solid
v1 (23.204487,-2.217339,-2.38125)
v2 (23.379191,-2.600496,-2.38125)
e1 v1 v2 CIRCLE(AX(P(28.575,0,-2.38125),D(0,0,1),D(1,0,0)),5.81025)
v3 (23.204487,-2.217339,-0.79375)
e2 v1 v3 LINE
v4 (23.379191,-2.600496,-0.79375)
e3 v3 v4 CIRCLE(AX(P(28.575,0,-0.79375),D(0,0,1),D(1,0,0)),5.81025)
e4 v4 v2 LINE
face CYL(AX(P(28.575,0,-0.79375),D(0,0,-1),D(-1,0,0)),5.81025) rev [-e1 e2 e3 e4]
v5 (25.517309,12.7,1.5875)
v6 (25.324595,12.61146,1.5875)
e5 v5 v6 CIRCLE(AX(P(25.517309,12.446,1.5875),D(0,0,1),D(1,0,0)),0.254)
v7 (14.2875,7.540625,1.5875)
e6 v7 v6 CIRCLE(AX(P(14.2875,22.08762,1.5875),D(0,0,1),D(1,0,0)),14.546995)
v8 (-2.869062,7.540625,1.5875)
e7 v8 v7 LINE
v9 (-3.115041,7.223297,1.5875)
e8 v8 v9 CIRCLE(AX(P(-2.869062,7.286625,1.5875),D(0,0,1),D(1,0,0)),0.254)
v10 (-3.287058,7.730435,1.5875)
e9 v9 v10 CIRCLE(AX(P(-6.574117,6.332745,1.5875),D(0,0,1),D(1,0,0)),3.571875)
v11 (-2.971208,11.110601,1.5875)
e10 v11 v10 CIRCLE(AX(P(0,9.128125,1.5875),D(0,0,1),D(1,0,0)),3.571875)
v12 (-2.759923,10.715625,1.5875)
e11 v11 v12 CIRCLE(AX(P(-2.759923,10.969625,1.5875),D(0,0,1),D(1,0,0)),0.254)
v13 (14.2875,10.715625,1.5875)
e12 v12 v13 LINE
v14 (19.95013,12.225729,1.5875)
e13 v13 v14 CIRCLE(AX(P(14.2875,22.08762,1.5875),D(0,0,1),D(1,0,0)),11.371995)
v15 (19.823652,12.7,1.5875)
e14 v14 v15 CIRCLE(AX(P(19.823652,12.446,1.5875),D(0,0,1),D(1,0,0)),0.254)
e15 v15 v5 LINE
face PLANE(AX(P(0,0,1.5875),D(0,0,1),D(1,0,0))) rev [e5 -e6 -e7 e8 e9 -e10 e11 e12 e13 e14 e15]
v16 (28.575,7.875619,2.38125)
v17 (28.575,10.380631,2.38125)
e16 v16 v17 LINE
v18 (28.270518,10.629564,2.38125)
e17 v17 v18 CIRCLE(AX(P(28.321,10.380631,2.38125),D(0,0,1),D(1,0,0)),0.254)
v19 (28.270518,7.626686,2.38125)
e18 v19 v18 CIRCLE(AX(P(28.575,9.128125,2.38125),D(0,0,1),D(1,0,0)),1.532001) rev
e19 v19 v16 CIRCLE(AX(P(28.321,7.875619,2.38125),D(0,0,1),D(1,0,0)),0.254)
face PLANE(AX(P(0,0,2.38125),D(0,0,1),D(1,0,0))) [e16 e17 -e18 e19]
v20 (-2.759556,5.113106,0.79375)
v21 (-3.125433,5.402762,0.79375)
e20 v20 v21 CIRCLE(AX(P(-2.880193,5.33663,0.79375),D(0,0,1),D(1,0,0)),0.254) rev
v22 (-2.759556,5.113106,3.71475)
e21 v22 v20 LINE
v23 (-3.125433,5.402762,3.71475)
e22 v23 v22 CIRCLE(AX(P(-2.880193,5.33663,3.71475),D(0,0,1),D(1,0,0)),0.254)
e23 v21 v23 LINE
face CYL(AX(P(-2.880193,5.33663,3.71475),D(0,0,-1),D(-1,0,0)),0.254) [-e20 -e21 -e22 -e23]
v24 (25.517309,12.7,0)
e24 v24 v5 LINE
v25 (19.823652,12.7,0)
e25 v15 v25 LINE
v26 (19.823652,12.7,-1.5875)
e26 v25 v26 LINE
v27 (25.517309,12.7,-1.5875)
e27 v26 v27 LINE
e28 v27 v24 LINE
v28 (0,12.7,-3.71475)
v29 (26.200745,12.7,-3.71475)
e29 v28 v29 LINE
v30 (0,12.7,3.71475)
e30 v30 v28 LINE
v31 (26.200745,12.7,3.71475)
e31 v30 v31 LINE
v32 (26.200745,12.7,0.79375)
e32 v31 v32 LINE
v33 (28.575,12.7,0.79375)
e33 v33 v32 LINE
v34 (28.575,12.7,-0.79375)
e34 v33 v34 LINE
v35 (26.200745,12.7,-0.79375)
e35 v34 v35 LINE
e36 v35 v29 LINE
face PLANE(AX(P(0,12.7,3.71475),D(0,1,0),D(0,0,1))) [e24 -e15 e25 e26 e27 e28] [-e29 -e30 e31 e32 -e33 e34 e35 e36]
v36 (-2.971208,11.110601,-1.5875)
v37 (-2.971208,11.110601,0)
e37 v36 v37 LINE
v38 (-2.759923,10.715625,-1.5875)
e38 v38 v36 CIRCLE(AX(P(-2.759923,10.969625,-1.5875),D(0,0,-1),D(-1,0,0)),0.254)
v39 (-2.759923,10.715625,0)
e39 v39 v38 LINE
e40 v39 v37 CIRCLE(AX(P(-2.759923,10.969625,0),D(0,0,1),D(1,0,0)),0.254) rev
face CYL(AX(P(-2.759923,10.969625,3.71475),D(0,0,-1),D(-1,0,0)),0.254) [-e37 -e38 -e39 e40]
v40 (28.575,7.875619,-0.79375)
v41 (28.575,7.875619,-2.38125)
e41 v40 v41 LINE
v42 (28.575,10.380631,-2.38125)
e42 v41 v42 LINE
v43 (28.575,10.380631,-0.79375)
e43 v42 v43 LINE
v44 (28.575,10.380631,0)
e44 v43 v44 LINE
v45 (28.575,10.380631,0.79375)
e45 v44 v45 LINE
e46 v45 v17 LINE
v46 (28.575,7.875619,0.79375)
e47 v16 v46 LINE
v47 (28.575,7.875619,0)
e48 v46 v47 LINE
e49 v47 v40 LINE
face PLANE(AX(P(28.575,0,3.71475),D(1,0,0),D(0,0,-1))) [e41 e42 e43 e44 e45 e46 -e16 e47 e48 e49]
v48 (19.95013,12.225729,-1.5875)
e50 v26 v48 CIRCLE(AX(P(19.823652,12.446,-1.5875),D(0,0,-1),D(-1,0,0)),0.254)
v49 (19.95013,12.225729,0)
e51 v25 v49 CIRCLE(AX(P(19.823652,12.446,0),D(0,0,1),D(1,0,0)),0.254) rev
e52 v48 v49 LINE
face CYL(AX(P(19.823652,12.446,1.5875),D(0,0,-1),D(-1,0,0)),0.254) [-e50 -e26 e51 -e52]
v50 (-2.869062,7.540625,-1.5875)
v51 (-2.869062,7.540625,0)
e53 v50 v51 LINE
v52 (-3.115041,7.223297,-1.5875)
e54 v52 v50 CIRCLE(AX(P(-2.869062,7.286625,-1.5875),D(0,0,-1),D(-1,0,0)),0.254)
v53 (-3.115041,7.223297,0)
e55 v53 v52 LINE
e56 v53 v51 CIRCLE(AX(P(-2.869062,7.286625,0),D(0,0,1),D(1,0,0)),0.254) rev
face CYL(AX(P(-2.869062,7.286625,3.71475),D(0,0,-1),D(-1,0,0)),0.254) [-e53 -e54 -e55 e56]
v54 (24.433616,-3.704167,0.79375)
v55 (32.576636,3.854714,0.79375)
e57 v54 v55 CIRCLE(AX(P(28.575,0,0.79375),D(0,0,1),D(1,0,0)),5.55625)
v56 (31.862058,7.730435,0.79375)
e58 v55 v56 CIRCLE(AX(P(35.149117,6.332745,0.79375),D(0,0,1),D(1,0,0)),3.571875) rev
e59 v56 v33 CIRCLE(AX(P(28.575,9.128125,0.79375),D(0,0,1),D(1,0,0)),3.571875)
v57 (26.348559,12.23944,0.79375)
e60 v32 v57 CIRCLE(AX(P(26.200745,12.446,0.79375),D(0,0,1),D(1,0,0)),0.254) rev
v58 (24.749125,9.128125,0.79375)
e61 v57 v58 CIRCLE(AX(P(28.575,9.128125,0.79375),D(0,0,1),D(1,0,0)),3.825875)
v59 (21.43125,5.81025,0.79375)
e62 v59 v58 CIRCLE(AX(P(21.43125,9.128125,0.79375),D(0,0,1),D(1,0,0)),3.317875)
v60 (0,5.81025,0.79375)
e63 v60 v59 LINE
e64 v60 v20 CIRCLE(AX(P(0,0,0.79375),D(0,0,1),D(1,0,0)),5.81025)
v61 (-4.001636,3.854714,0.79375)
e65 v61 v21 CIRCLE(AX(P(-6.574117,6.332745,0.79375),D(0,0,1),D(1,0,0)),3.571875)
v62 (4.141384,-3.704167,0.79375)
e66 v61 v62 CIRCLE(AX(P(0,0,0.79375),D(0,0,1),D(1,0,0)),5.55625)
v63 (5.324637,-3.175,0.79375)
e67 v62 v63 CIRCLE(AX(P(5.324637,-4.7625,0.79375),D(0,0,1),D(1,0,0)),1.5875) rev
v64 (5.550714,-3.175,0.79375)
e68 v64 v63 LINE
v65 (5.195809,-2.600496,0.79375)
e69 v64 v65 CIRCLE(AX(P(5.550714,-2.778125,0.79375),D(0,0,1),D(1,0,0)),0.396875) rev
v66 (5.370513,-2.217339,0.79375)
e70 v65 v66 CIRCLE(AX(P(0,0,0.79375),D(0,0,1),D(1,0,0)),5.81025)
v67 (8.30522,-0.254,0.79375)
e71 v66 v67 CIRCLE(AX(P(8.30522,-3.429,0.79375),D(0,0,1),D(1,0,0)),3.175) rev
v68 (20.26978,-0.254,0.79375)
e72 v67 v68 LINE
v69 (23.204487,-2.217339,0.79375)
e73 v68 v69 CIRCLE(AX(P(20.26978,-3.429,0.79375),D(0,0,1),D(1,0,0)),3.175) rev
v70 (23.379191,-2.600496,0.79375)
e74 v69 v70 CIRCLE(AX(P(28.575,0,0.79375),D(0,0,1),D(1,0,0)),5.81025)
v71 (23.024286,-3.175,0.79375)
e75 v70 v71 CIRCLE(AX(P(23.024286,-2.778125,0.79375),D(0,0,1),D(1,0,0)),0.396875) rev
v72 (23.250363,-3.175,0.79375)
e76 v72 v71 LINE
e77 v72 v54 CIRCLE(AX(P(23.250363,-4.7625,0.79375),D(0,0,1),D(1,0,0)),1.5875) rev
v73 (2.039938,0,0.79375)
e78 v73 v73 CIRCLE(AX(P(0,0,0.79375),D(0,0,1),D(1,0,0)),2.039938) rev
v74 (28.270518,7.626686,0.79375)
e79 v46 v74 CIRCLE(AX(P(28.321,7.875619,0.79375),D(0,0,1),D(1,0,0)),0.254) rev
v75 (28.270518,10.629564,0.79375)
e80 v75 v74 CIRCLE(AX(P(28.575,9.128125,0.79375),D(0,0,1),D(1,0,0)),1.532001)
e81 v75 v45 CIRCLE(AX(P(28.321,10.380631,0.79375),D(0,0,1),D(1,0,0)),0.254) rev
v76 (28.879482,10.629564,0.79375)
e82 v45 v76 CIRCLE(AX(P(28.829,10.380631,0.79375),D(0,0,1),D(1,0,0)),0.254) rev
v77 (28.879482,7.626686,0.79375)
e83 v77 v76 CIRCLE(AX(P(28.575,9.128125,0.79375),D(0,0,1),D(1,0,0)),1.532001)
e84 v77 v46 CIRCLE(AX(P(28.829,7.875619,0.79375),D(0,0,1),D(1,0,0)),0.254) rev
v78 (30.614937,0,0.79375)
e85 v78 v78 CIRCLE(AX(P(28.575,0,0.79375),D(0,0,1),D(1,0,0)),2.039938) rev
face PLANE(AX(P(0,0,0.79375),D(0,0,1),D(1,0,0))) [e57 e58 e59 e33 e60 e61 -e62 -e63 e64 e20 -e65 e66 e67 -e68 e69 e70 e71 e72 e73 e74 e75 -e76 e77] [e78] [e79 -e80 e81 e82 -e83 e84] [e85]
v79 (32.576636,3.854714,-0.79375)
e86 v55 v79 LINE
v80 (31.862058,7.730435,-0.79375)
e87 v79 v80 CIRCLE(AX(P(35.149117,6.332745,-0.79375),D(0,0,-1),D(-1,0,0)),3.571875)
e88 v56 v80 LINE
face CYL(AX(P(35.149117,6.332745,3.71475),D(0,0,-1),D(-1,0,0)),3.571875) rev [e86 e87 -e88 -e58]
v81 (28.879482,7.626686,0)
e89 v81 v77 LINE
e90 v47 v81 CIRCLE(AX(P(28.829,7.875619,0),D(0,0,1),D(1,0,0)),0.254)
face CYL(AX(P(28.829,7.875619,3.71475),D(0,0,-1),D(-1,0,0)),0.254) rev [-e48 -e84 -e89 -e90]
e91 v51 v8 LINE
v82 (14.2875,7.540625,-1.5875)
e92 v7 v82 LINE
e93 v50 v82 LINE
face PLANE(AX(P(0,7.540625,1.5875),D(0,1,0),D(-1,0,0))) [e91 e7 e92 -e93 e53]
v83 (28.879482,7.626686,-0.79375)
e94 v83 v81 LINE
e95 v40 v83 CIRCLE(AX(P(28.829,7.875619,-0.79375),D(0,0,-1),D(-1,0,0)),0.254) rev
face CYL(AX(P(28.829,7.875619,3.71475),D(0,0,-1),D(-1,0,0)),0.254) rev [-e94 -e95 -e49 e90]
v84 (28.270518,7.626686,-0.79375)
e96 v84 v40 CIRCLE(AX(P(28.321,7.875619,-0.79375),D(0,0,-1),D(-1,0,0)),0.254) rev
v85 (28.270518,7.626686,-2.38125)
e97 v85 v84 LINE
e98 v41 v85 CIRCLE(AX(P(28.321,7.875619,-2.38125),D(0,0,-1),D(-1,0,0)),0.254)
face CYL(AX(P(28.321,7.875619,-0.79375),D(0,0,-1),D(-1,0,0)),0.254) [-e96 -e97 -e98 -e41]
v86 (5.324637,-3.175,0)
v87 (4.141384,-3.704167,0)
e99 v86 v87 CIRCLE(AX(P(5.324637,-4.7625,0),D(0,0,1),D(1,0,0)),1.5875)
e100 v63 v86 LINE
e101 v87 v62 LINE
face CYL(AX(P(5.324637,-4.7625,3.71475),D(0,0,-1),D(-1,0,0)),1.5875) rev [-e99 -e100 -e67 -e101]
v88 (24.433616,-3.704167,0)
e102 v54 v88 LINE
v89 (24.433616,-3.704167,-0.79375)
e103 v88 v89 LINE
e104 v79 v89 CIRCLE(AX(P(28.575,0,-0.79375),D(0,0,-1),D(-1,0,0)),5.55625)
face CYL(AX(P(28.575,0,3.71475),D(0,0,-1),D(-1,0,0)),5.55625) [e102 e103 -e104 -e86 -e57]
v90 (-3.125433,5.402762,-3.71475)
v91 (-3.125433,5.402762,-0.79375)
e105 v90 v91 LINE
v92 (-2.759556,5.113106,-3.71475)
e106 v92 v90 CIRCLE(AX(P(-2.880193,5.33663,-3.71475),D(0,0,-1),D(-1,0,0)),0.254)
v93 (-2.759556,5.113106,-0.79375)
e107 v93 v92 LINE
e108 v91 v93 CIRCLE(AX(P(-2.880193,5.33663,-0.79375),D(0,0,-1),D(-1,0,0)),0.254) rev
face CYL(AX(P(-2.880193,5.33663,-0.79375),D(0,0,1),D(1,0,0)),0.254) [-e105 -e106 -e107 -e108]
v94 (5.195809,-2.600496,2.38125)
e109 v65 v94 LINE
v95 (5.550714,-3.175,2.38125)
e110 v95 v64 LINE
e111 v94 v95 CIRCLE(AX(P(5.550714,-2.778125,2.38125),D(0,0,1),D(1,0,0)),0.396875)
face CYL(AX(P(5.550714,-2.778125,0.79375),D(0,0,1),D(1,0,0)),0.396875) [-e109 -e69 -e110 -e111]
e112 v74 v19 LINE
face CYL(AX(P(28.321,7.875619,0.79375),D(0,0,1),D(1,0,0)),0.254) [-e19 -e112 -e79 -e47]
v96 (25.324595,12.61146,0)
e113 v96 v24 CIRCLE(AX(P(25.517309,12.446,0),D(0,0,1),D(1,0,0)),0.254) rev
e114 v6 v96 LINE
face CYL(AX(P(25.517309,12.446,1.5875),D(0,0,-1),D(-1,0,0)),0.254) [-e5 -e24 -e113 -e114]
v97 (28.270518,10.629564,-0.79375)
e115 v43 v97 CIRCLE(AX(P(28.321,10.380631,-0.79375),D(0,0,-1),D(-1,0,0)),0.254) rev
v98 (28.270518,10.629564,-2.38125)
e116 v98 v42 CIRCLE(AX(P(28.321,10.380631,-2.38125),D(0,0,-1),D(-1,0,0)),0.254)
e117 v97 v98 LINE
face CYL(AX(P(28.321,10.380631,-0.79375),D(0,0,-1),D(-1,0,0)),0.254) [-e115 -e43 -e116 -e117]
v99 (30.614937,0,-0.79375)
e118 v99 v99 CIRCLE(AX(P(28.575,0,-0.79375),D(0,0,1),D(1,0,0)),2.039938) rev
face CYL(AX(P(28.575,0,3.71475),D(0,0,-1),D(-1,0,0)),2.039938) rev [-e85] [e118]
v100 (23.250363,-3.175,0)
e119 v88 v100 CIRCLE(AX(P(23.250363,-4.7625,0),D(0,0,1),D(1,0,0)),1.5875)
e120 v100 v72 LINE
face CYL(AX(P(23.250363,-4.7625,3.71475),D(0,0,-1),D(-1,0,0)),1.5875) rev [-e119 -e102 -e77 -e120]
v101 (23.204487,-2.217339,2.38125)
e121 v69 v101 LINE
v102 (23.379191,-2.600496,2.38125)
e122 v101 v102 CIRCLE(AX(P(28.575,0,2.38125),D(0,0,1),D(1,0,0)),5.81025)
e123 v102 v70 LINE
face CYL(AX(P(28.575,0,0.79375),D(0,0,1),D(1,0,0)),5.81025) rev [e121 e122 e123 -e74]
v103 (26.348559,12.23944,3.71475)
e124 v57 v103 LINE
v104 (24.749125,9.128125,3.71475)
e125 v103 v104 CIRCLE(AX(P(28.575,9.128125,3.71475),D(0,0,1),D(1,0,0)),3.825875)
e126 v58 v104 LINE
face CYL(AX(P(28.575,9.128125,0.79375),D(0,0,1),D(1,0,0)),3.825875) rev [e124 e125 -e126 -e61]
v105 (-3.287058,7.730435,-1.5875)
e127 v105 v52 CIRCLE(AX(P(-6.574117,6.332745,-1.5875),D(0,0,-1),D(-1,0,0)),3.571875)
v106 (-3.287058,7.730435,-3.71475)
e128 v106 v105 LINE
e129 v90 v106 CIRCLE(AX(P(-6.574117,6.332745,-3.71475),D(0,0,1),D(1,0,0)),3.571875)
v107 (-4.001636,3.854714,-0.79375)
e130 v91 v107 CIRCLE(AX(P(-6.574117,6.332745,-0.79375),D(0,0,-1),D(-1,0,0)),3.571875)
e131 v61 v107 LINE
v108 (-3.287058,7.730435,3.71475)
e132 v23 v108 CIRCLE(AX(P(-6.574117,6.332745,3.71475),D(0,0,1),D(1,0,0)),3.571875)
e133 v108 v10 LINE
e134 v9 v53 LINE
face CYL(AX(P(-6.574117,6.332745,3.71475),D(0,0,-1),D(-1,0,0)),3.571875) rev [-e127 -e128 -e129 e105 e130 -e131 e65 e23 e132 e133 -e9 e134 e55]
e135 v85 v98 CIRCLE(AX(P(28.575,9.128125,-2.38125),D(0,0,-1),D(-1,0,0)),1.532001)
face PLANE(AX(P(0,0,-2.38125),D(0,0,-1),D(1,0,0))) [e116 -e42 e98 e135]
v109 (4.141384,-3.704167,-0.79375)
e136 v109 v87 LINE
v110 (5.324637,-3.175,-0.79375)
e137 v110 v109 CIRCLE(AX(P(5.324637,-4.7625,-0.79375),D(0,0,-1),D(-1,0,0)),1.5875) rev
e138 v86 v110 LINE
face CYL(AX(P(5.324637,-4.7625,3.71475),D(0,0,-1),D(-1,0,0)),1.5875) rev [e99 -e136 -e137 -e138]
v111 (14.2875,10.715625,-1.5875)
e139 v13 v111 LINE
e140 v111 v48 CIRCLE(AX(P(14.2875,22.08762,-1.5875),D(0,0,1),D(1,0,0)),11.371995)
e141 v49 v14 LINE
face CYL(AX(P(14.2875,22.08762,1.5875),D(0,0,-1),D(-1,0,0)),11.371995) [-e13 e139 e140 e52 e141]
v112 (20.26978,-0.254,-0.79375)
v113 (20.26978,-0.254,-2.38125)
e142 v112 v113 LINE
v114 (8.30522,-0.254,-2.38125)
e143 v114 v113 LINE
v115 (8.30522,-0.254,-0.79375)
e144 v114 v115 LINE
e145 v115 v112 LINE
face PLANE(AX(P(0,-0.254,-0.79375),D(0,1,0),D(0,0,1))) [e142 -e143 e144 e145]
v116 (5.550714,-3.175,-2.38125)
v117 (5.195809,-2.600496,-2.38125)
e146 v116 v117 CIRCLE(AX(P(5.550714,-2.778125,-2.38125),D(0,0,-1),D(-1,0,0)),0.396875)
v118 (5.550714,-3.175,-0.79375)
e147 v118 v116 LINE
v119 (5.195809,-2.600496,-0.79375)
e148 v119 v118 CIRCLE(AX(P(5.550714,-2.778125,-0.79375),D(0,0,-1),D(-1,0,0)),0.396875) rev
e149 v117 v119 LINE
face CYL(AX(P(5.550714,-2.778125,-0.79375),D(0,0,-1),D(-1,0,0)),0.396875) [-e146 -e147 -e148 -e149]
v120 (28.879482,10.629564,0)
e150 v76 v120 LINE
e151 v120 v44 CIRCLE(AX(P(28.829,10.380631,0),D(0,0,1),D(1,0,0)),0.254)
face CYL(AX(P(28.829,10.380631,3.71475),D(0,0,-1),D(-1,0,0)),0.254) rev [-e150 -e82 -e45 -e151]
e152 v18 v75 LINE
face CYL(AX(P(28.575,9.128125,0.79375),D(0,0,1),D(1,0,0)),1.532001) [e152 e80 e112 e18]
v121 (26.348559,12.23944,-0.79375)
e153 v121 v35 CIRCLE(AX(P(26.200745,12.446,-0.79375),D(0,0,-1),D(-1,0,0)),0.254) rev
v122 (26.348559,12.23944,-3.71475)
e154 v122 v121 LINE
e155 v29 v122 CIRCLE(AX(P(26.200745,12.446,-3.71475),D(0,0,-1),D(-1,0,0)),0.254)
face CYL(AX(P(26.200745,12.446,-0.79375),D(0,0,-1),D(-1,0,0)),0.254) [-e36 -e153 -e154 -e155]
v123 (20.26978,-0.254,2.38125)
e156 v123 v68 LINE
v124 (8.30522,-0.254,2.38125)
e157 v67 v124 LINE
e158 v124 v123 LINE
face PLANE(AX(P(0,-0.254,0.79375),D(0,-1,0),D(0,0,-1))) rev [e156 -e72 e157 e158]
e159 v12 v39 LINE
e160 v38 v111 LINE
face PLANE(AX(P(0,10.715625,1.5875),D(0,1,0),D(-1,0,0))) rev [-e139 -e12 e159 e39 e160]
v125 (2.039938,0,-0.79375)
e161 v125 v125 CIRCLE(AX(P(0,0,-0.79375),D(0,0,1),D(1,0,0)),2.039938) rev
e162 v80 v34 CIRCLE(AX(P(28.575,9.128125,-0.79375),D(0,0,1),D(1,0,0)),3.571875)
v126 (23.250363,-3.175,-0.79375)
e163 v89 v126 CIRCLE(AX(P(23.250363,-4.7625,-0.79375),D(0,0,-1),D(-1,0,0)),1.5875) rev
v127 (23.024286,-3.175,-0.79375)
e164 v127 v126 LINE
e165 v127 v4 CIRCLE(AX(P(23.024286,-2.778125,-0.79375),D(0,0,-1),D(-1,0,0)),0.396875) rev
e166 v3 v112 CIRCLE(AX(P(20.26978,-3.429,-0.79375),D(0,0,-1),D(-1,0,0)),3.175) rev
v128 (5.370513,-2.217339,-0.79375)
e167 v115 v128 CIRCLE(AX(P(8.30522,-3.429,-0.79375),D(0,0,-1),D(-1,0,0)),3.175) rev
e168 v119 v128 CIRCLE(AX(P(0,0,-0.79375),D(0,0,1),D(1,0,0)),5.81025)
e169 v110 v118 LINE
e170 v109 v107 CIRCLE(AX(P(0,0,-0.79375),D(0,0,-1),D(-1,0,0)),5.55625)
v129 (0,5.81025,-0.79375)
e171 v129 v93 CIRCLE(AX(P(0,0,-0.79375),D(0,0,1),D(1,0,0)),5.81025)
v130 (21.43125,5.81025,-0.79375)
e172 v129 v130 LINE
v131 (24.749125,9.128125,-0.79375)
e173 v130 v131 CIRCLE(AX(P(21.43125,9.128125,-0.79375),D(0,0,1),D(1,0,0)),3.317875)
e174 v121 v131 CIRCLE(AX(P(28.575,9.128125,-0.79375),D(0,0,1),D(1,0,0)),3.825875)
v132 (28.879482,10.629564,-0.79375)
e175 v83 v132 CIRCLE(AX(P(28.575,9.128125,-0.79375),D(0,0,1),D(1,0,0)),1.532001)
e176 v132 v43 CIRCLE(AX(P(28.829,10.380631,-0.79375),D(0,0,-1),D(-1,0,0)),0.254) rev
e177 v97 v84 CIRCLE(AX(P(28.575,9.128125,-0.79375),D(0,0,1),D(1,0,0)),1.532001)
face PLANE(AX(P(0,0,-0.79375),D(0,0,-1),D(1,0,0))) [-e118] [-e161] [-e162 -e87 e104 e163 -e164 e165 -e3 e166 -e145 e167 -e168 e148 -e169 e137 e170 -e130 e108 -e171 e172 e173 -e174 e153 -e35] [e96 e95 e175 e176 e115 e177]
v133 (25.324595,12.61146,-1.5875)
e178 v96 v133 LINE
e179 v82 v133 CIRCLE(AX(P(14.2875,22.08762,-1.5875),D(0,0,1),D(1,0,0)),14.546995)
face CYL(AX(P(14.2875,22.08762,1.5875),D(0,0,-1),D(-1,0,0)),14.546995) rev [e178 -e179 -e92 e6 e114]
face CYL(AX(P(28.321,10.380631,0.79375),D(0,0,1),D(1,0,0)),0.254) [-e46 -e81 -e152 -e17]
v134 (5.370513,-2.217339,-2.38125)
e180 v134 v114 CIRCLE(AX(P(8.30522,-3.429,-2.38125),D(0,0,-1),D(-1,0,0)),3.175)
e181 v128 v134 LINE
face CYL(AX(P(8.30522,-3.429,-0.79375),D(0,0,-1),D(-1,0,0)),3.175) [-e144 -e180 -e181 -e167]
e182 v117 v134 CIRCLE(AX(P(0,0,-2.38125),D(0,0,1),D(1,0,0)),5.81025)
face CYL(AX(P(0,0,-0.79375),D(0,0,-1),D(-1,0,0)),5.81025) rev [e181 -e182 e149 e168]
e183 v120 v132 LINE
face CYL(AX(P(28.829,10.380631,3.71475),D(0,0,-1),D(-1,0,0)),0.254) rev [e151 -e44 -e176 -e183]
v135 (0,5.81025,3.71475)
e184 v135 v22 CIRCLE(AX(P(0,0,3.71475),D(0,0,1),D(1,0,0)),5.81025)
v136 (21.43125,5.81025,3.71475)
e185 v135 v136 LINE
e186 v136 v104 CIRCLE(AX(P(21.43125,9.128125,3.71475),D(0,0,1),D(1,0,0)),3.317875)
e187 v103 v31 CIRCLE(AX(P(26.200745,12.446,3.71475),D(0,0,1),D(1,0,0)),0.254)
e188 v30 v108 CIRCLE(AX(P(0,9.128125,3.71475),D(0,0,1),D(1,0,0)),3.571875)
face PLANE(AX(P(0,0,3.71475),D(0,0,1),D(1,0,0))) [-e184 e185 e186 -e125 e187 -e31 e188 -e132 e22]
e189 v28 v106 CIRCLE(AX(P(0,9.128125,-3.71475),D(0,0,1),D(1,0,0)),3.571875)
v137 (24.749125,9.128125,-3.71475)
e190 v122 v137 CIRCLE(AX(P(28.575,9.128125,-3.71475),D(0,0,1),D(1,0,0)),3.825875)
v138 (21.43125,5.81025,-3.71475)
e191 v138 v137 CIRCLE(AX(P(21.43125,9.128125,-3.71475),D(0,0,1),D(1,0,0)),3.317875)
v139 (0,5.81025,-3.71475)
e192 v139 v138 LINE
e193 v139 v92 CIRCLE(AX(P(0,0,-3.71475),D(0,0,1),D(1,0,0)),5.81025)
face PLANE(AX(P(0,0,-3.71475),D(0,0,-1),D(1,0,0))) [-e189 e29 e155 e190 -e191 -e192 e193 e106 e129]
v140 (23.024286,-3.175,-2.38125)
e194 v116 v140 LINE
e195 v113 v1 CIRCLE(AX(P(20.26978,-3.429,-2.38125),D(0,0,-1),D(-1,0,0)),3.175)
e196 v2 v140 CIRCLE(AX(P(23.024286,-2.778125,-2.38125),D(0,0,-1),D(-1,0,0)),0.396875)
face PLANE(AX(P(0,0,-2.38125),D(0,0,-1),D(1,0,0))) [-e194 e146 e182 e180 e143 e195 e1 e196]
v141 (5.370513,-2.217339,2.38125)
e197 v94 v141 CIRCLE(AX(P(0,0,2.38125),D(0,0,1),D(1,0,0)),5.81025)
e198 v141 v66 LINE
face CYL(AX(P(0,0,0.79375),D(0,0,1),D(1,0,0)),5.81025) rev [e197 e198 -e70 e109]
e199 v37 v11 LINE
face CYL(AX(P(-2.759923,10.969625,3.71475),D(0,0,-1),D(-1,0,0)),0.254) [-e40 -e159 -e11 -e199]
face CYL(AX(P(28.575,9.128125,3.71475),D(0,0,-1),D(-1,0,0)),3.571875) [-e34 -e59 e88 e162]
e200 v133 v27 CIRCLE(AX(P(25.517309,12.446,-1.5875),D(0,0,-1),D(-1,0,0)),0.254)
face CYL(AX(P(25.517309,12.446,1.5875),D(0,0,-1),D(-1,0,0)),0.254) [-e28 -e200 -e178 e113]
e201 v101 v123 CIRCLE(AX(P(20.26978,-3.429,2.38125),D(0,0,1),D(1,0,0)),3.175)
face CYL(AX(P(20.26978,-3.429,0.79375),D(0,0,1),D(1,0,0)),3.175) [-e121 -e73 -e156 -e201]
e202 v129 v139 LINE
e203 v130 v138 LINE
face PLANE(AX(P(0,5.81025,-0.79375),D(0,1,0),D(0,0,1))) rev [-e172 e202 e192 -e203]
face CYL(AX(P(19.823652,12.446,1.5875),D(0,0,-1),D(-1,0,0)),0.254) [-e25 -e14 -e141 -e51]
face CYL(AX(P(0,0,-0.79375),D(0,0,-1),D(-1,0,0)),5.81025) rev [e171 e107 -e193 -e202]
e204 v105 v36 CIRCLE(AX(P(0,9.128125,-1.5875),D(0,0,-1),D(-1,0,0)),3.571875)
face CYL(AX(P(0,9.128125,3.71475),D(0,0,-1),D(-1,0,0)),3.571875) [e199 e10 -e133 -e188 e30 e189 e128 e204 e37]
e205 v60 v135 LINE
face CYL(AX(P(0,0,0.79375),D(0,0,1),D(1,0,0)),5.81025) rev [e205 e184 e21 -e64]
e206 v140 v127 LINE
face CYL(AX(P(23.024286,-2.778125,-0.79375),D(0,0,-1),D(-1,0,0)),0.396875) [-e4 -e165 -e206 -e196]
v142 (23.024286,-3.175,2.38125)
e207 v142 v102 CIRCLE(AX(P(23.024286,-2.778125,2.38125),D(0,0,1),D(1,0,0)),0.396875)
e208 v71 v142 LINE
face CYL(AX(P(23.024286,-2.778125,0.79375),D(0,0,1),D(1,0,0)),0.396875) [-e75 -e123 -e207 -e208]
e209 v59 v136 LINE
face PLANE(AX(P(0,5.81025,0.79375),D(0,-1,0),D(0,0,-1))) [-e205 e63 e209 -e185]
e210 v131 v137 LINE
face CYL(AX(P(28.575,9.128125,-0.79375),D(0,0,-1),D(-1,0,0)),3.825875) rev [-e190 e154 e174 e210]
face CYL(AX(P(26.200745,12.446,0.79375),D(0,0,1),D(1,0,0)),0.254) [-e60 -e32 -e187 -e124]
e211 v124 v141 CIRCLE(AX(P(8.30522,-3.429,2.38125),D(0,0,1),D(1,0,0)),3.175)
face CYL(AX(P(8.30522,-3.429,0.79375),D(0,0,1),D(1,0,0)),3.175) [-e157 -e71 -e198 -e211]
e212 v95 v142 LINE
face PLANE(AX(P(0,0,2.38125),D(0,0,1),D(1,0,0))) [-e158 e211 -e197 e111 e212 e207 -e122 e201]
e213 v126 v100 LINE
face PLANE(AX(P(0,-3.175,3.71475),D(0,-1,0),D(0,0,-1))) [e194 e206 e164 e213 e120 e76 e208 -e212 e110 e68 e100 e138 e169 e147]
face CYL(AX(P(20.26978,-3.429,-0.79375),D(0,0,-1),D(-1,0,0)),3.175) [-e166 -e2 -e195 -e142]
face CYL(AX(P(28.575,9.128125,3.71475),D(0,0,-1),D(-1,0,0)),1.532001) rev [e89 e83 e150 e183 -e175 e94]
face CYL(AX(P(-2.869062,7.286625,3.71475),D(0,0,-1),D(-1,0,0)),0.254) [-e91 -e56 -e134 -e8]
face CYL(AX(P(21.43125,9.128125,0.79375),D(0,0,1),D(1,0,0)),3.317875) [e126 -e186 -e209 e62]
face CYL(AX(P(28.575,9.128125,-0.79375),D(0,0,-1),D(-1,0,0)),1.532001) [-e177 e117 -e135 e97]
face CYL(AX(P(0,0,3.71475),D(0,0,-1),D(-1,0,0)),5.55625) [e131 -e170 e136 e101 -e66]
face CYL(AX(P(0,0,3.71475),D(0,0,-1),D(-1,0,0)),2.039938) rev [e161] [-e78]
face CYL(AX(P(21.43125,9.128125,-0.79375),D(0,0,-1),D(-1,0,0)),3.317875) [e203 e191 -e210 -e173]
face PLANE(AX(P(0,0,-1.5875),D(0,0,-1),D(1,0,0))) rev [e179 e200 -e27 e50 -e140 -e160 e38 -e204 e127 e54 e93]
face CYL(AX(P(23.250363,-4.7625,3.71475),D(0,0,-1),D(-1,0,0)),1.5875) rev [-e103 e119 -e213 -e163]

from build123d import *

# Parameters (mm, degrees)
SKETCH2_R           = 2.0399375
BOSS_EXTRUDE1_DEPTH = 3.71475
CUT_EXTRUDE1_DEPTH  = 1.5875
CUT_EXTRUDE5_DEPTH  = 37.606441976
CUT_EXTRUDE6_START  = -2.921
SKETCH4_R           = 2.0399375
SKETCH4_R_2         = 1.532001
CUT_EXTRUDE6_DEPTH  = 2.921
CUT_EXTRUDE7_START  = -1.3335
CUT_EXTRUDE7_DEPTH  = 1.3335
FILLET7_R           = 1.5875
FILLET8_R           = 0.254
FILLET9_R           = 0.254
FILLET10_R          = 3.175
FILLET11_R          = 0.396875
MIRROR1_START       = -3.71475
MIRROR1_DEPTH       = 2.12725
MIRROR1_START_2     = -0.79375
MIRROR1_2_OUTLINE_R = 2.0399375
MIRROR1_2_DEPTH     = 0.79375
MIRROR1_START_3     = -2.38125
MIRROR1_3_DEPTH     = 1.5875


# Read off the part's stored shape, not the designer's step: Mirror1
with BuildPart() as part:
    # Sketch2 → Boss-Extrude1 (new body)
    with BuildSketch(Plane.XY):
        with BuildLine():
            ThreePointArc((-4.001636291, 3.854714135), (-3.525917183, -4.294161394), (4.559746601, -3.175))
            Line((4.559746601, -3.175), (24.015253399, -3.175))
            ThreePointArc((24.015253399, -3.175), (32.100917183, -4.294161394), (32.576636291, 3.854714135))
            ThreePointArc((32.576636291, 3.854714135), (31.636446649, 5.685103372), (31.862058429, 7.730434799))
            ThreePointArc((31.862058429, 7.730434799), (31.554149686, 11.098647308), (28.575, 12.7))
            Line((28.575, 12.7), (0, 12.7))
            ThreePointArc((0, 12.7), (-2.979149712, 11.098647268), (-3.287058392, 7.730434711))
            ThreePointArc((-3.287058392, 7.730434711), (-3.061446658, 5.685103325), (-4.001636291, 3.854714135))
        make_face()
        Circle(SKETCH2_R, mode=Mode.SUBTRACT)
        with Locations((28.575, 0)):
            Circle(SKETCH2_R, mode=Mode.SUBTRACT)
    extrude(amount=BOSS_EXTRUDE1_DEPTH)

    # Sketch3 → Cut-Extrude1 (cut)
    with BuildSketch(Plane.XY):
        with BuildLine():
            Line((5.215962398, 10.715625), (-3.571875, 10.715625))
            Line((-3.571875, 10.715625), (-3.571875, 7.540625))
            Line((-3.571875, 7.540625), (14.2875, 7.540625))
            ThreePointArc((14.2875, 7.540625), (9.481945415, 8.357299211), (5.215962398, 10.715625))
        make_face()
        with BuildLine():
            Line((14.2875, 10.715625), (5.215962398, 10.715625))
            ThreePointArc((5.215962398, 10.715625), (9.481945415, 8.357299211), (14.2875, 7.540625))
            Line((14.2875, 7.540625), (14.2875, 10.715625))
        make_face()
        with BuildLine():
            ThreePointArc((20.705822349, 12.7), (17.646540262, 11.22303906), (14.2875, 10.715625))
            Line((14.2875, 10.715625), (14.2875, 7.540625))
            ThreePointArc((14.2875, 7.540625), (20.41340415, 8.893365099), (25.4, 12.7))
            Line((25.4, 12.7), (20.705822349, 12.7))
        make_face()
    extrude(amount=CUT_EXTRUDE1_DEPTH, mode=Mode.SUBTRACT)

    # Sketch2<11> → Cut-Extrude5 (cut, through all)
    with BuildSketch(Plane.XY):
        with BuildLine():
            ThreePointArc((30.107001, 9.128125), (29.658288296, 10.211413296), (28.575, 10.660126))
            Line((28.575, 10.660126), (28.575, 7.596124))
            ThreePointArc((28.575, 7.596124), (29.658288296, 8.044836704), (30.107001, 9.128125))
        make_face()
    extrude(amount=CUT_EXTRUDE5_DEPTH, mode=Mode.SUBTRACT)

    # Sketch4 → Cut-Extrude6 (cut)
    with BuildSketch(Plane.XY.offset(3.71475).offset(CUT_EXTRUDE6_START)):
        with BuildLine():
            ThreePointArc((-4.001636291, 3.854714135), (-3.525917183, -4.294161394), (4.559746601, -3.175))
            Line((4.559746601, -3.175), (4.866043574, -3.175))
            ThreePointArc((4.866043574, -3.175), (5.531656893, -1.777576181), (5.804695432, -0.254))
            Line((5.804695432, -0.254), (22.770304568, -0.254))
            ThreePointArc((22.770304568, -0.254), (23.043343107, -1.777576181), (23.708956426, -3.175))
            Line((23.708956426, -3.175), (24.015253399, -3.175))
            ThreePointArc((24.015253399, -3.175), (32.100917183, -4.294161394), (32.576636291, 3.854714135))
            ThreePointArc((32.576636291, 3.854714135), (31.636446649, 5.685103372), (31.862058429, 7.730434799))
            ThreePointArc((31.862058429, 7.730434799), (31.554149686, 11.098647308), (28.575, 12.7))
            Line((28.575, 12.7), (27.204223395, 12.7))
            ThreePointArc((27.204223395, 12.7), (25.422085518, 11.295254389), (24.749125, 9.128125))
            ThreePointArc((24.749125, 9.128125), (23.777341912, 6.782033088), (21.43125, 5.81025))
            Line((21.43125, 5.81025), (0, 5.81025))
            ThreePointArc((0, 5.81025), (-1.778548333, 5.531344402), (-3.386347701, 4.72140385))
            ThreePointArc((-3.386347701, 4.72140385), (-3.661573813, 4.265044368), (-4.001636291, 3.854714135))
        make_face()
        Circle(SKETCH4_R, mode=Mode.SUBTRACT)
        with Locations((28.575, 0)):
            Circle(SKETCH4_R, mode=Mode.SUBTRACT)
        with Locations((28.575, 9.128125)):
            Circle(SKETCH4_R_2, mode=Mode.SUBTRACT)
    extrude(amount=CUT_EXTRUDE6_DEPTH, mode=Mode.SUBTRACT)

    # Sketch4<4> → Cut-Extrude7 (cut)
    with BuildSketch(Plane.XY.offset(3.71475).offset(CUT_EXTRUDE7_START)):
        with BuildLine():
            Line((22.770304568, -0.254), (5.804695432, -0.254))
            ThreePointArc((5.804695432, -0.254), (5.531656893, -1.777576181), (4.866043574, -3.175))
            Line((4.866043574, -3.175), (23.708956426, -3.175))
            ThreePointArc((23.708956426, -3.175), (23.043343107, -1.777576181), (22.770304568, -0.254))
        make_face()
        with BuildLine():
            Line((28.575, 7.596124), (28.575, 10.660126))
            ThreePointArc((28.575, 10.660126), (27.042999, 9.128125), (28.575, 7.596124))
        make_face()
    extrude(amount=CUT_EXTRUDE7_DEPTH, mode=Mode.SUBTRACT)

    # Fillet7
    # the kernel refuses this fillet: 1.5875 mm, written as the material it adds along each edge
    with BuildSketch(Plane(origin=(24.015253399, -3.175, 0), x_dir=(-1, 0, 0), z_dir=(0, 0, 1))) as fillet7_piece_1_section:
        with BuildLine():
            CenterArc((0.764890271, 1.5875), FILLET7_R, 221.810314896, 48.189685104)
            ThreePointArc((-0.418362367, 0.529166667), (-0.201143179, 0.270938228), (0, 0))
            Line((0, 0), (0.764890271, 0))
        make_face()
    fillet7_piece_1 = extrude(amount=0.79375, mode=Mode.PRIVATE)
    fillet7_piece_1 = fillet7_piece_1 - Plane(origin=(28.575, 0, 0.396875), x_dir=(-0.9990440053979357, -0.04371584699453488, 0), z_dir=(0, 0, -1)) * Cylinder(5.81025, 5, mode=Mode.PRIVATE)
    add(fillet7_piece_1)
    with BuildSketch(Plane(origin=(24.015253399, -3.175, 0), x_dir=(-1, 0, 0), z_dir=(0, 0, 1))) as fillet7_piece_2_section:
        with BuildLine():
            CenterArc((0.764890271, 1.5875), FILLET7_R, 221.810314896, 48.189685104)
            ThreePointArc((-0.418362367, 0.529166667), (-0.201143179, 0.270938228), (0, 0))
            Line((0, 0), (0.764890271, 0))
        make_face()
    fillet7_piece_2 = extrude(amount=0.79375, mode=Mode.PRIVATE)
    fillet7_piece_2 = fillet7_piece_2 & Plane(origin=(28.575, 0, 0.396875), x_dir=(-0.9990440053979357, -0.04371584699453488, 0), z_dir=(0, 0, -1)) * Cylinder(5.81025, 5, mode=Mode.PRIVATE)
    add(fillet7_piece_2)
    with BuildSketch(Plane(origin=(24.015253399, -3.175, 0), x_dir=(-1, 0, 0), z_dir=(0, 0, 1))) as fillet7_piece_3_section:
        with BuildLine():
            CenterArc((0.764890271, 1.5875), FILLET7_R, 221.810314896, 48.189685104)
            ThreePointArc((-0.418362367, 0.529166667), (-0.201143179, 0.270938228), (0, 0))
            Line((0, 0), (0.764890271, 0))
        make_face()
    fillet7_piece_3 = extrude(amount=2.705975677, mode=Mode.PRIVATE)
    fillet7_piece_3 = split(fillet7_piece_3, bisect_by=Plane(origin=(23.539616467, -3.178074263, 0.79375), z_dir=(0, 0, 1)), keep=Keep.TOP, mode=Mode.PRIVATE)
    fillet7_piece_3 = fillet7_piece_3 - Plane(origin=(28.575, 0, 1.5875), x_dir=(-0.9990440053979357, -0.04371584699453488, 0), z_dir=(0, 0, -1)) * Cylinder(5.81025, 9, mode=Mode.PRIVATE)
    fillet7_piece_3 = split(fillet7_piece_3, bisect_by=Plane(origin=(23.539616467, -3.178074263, 2.38125), z_dir=(0, 0, -1)), keep=Keep.TOP, mode=Mode.PRIVATE)
    add(fillet7_piece_3)
    with BuildSketch(Plane(origin=(4.559746601, -3.175, 0), x_dir=(-0.6201913572080736, -0.7844505595921312, 0), z_dir=(0, 0, 1))) as fillet7_piece_4_section:
        with BuildLine():
            CenterArc((0.770936928, 1.58457238), FILLET7_R, 218.330109737, 48.189685104)
            Line((-0.474378335, 0.600018601), (0, 0))
            ThreePointArc((0, 0), (0.337284906, 0.010246668), (0.674569812, 0))
        make_face()
    fillet7_piece_4 = extrude(amount=0.79375, mode=Mode.PRIVATE)
    fillet7_piece_4 = fillet7_piece_4 & Plane(origin=(0, 0, 0.396875), x_dir=(0.8374929777271225, -0.5464480874316952, 0), z_dir=(0, 0, -1)) * Cylinder(5.81025, 5, mode=Mode.PRIVATE)
    add(fillet7_piece_4)
    with BuildSketch(Plane(origin=(4.559746601, -3.175, 0), x_dir=(-0.6201913572080736, -0.7844505595921312, 0), z_dir=(0, 0, 1))) as fillet7_piece_5_section:
        with BuildLine():
            CenterArc((0.770936928, 1.58457238), FILLET7_R, 218.330109737, 48.189685104)
            Line((-0.474378335, 0.600018601), (0, 0))
            ThreePointArc((0, 0), (0.337284906, 0.010246668), (0.674569812, 0))
        make_face()
    fillet7_piece_5 = extrude(amount=0.79375, mode=Mode.PRIVATE)
    fillet7_piece_5 = fillet7_piece_5 - Plane(origin=(0, 0, 0.396875), x_dir=(0.8374929777271225, -0.5464480874316952, 0), z_dir=(0, 0, -1)) * Cylinder(5.81025, 5, mode=Mode.PRIVATE)
    add(fillet7_piece_5)
    with BuildSketch(Plane(origin=(4.559746601, -3.175, 0), x_dir=(-0.6201913572080736, -0.7844505595921312, 0), z_dir=(0, 0, 1))) as fillet7_piece_6_section:
        with BuildLine():
            CenterArc((0.770936928, 1.58457238), FILLET7_R, 218.330109737, 48.189685104)
            Line((-0.474378335, 0.600018601), (0, 0))
            ThreePointArc((0, 0), (0.337284906, 0.010246668), (0.674569812, 0))
        make_face()
    fillet7_piece_6 = extrude(amount=2.705975677, mode=Mode.PRIVATE)
    fillet7_piece_6 = split(fillet7_piece_6, bisect_by=Plane(origin=(5.035383533, -3.178074263, 0.79375), z_dir=(0, 0, 1)), keep=Keep.TOP, mode=Mode.PRIVATE)
    fillet7_piece_6 = split(fillet7_piece_6, bisect_by=Plane(origin=(5.035383533, -3.178074263, 2.38125), z_dir=(0, 0, -1)), keep=Keep.TOP, mode=Mode.PRIVATE)
    fillet7_piece_6 = fillet7_piece_6 - Plane(origin=(0, 0, 1.5875), x_dir=(0.8374929777271225, -0.5464480874316952, 0), z_dir=(0, 0, -1)) * Cylinder(5.81025, 9, mode=Mode.PRIVATE)
    add(fillet7_piece_6)

    # Fillet8
    fillet8_edges = [part.edges().sort_by_distance(p)[0] for p in [
        (-3.386347701, 4.72140385, 2.25425),
        (27.204223395, 12.7, 2.25425),
        (28.575, 7.596124, 1.5875),
        (28.575, 10.660126, 1.5875),
        (-3.199708544, 10.715625, 0.79375),
        (-3.212671341, 7.540625, 0.79375),
        (25.4, 12.7, 0.79375),
        (20.705822349, 12.7, 0.79375),
    ]]
    fillet(fillet8_edges, radius=FILLET8_R)

    # Fillet9
    fillet9_edges = [part.edges().sort_by_distance(p)[0] for p in [
        (28.575, 7.596124, 0.396875),
        (28.575, 10.660126, 0.396875),
    ]]
    fillet(fillet9_edges, radius=FILLET9_R)

    # Fillet10
    fillet10_edges = [part.edges().sort_by_distance(p)[0] for p in [
        (22.770304568, -0.254, 1.5875),
        (5.804695432, -0.254, 1.5875),
    ]]
    fillet(fillet10_edges, radius=FILLET10_R)

    # Fillet11
    # the kernel refuses this fillet: 0.396875 mm, written as the material it takes off along each edge
    with BuildSketch(Plane(origin=(4.808716583, -3.261173085, 4.295563111), x_dir=(0.5055235209104179, 0.8628128243172642, 0), z_dir=(0, 0, -1))) as fillet11_piece_1:
        with BuildLine():
            CenterArc((0.791877063, 0.396012434), FILLET11_R, 149.633888985, 116.587905539)
            Line((0.449448223, 0.596642082), (0.415205339, 0.616705046))
            ThreePointArc((0.415205339, 0.616705046), (0.3009182, 0.421643085), (-0.025863857, 0.030102468))
            Line((-0.025863857, 0.030102468), (0.002615182, -0.039601243))
            ThreePointArc((0.002615182, -0.039601243), (0.382862622, -0.027059536), (0.763110063, -0.039601243))
            Line((0.763110063, -0.039601243), (0.765725244, 0))
        make_face()
    extrude(amount=3.501813111, mode=Mode.SUBTRACT)
    with BuildSketch(Plane(origin=(23.766283417, -3.261173085, 4.295563111), x_dir=(-0.5055235209104277, 0.8628128243172586, 0), z_dir=(0, 0, -1))) as fillet11_piece_2:
        with BuildLine():
            CenterArc((0.791877063, -0.396012434), FILLET11_R, 93.778205477, 116.587905539)
            Line((0.449448223, -0.596642082), (0.415205339, -0.616705046))
            ThreePointArc((0.415205339, -0.616705046), (0.3009182, -0.421643085), (-0.025863857, -0.030102468))
            Line((-0.025863857, -0.030102468), (0.002615182, 0.039601243))
            ThreePointArc((0.002615182, 0.039601243), (0.382862622, 0.027059536), (0.763110063, 0.039601243))
            Line((0.763110063, 0.039601243), (0.765725244, 0))
        make_face()
    extrude(amount=3.501813111, mode=Mode.SUBTRACT)

    # Mirror1 2 outline → Mirror1 2 (add)
    # profile 1 of 2: a face of its own
    with BuildSketch(Plane.XY.offset(MIRROR1_START_2)):
        with BuildLine():
            ThreePointArc((4.141384233, -3.704166667), (4.67654271, -3.3133174), (5.324636871, -3.175))
            Line((5.324636871, -3.175), (23.250363129, -3.175))
            ThreePointArc((23.250363129, -3.175), (23.89845729, -3.3133174), (24.433615767, -3.704166667))
            ThreePointArc((24.433615767, -3.704166667), (32.355086231, -4.072206054), (32.57663634, 3.854714083))
            ThreePointArc((32.57663634, 3.854714083), (31.636446658, 5.685103328), (31.862058422, 7.730434783))
            ThreePointArc((31.862058422, 7.730434783), (31.554149691, 11.0986473), (28.575, 12.7))
            Line((28.575, 12.7), (25.517309382, 12.7))
            ThreePointArc((25.517309382, 12.7), (25.411268872, 12.676806001), (25.324594531, 12.611459923))
            ThreePointArc((25.324594531, 12.611459923), (20.360613339, 8.868983216), (14.2875, 7.540625))
            Line((14.2875, 7.540625), (-2.869061969, 7.540625))
            ThreePointArc((-2.869061969, 7.540625), (-3.069812253, 7.442237736), (-3.115040716, 7.223296838))
            ThreePointArc((-3.115040716, 7.223296838), (-3.119879404, 5.423605018), (-4.00163634, 3.854714083))
            ThreePointArc((-4.00163634, 3.854714083), (-3.780086231, -4.072206054), (4.141384233, -3.704166667))
        make_face()
        Circle(MIRROR1_2_OUTLINE_R, mode=Mode.SUBTRACT)
        with Locations((28.575, 0)):
            Circle(MIRROR1_2_OUTLINE_R, mode=Mode.SUBTRACT)
        with BuildLine():
            ThreePointArc((28.879481964, 7.626686424), (28.668230629, 7.678974408), (28.575, 7.875619289))
            Line((28.575, 7.875619289), (28.575, 10.380630711))
            ThreePointArc((28.575, 10.380630711), (28.668230629, 10.577275592), (28.879481964, 10.629563576))
            ThreePointArc((28.879481964, 10.629563576), (30.107001, 9.128125), (28.879481964, 7.626686424))
        make_face(mode=Mode.SUBTRACT)
    # profile 2 of 2: a face of its own
    with BuildSketch(Plane.XY.offset(MIRROR1_START_2)):
        with BuildLine():
            ThreePointArc((0, 12.7), (-1.684804778, 12.277684315), (-2.971208445, 11.110601077))
            ThreePointArc((-2.971208445, 11.110601077), (-2.983891173, 10.849816661), (-2.759922511, 10.715625))
            Line((-2.759922511, 10.715625), (14.2875, 10.715625))
            ThreePointArc((14.2875, 10.715625), (17.217764137, 11.099634629), (19.950129906, 12.225729035))
            ThreePointArc((19.950129906, 12.225729035), (20.069074763, 12.511449121), (19.823651837, 12.7))
            Line((19.823651837, 12.7), (0, 12.7))
        make_face()
    extrude(amount=MIRROR1_2_DEPTH)



with BuildPart() as body_2:
    # Mirror1 outline → Mirror1 (new body)
    with BuildSketch(Plane.XY.offset(MIRROR1_START)):
        with BuildLine():
            ThreePointArc((-3.125432568, 5.402761891), (-3.037852661, 5.137483193), (-2.759556449, 5.113106029))
            ThreePointArc((-2.759556449, 5.113106029), (-1.423126972, 5.633268561), (0, 5.81025))
            Line((0, 5.81025), (21.43125, 5.81025))
            ThreePointArc((21.43125, 5.81025), (23.777341912, 6.782033088), (24.749125, 9.128125))
            ThreePointArc((24.749125, 9.128125), (25.172397669, 10.877301061), (26.348558799, 12.239439689))
            ThreePointArc((26.348558799, 12.239439689), (26.442594731, 12.523619846), (26.200745275, 12.7))
            Line((26.200745275, 12.7), (0, 12.7))
            ThreePointArc((0, 12.7), (-2.979149691, 11.0986473), (-3.287058422, 7.730434783))
            ThreePointArc((-3.287058422, 7.730434783), (-3.010821642, 6.580167919), (-3.125432568, 5.402761891))
        make_face()
    extrude(amount=MIRROR1_DEPTH)


with BuildPart() as part_1:
    add(part.part)

    add(body_2.part)  # Mirror1 3 merges body 2
    # Mirror1 3 outline → Mirror1 3 (add)
    with BuildSketch(Plane.XY.offset(MIRROR1_START_3)):
        with BuildLine():
            ThreePointArc((5.195808704, -2.600495524), (5.213070024, -2.986707199), (5.55071367, -3.175))
            Line((5.55071367, -3.175), (23.02428633, -3.175))
            ThreePointArc((23.02428633, -3.175), (23.361929976, -2.986707199), (23.379191296, -2.600495524))
            ThreePointArc((23.379191296, -2.600495524), (23.288366692, -2.410500638), (23.204486818, -2.217339223))
            ThreePointArc((23.204486818, -2.217339223), (22.035226569, -0.790094169), (20.269780162, -0.254))
            Line((20.269780162, -0.254), (8.305219838, -0.254))
            ThreePointArc((8.305219838, -0.254), (6.539773431, -0.790094169), (5.370513182, -2.217339223))
            ThreePointArc((5.370513182, -2.217339223), (5.286633308, -2.410500638), (5.195808704, -2.600495524))
        make_face()
        with BuildLine():
            ThreePointArc((-3.115040716, 7.223296838), (-3.002300034, 6.312356167), (-3.125432568, 5.402761891))
            ThreePointArc((-3.125432568, 5.402761891), (-3.037852661, 5.137483193), (-2.759556449, 5.113106029))
            ThreePointArc((-2.759556449, 5.113106029), (-1.423126972, 5.633268561), (0, 5.81025))
            Line((0, 5.81025), (21.43125, 5.81025))
            ThreePointArc((21.43125, 5.81025), (23.777341912, 6.782033088), (24.749125, 9.128125))
            ThreePointArc((24.749125, 9.128125), (25.172397669, 10.877301061), (26.348558799, 12.239439689))
            ThreePointArc((26.348558799, 12.239439689), (26.442594731, 12.523619846), (26.200745275, 12.7))
            Line((26.200745275, 12.7), (25.517309382, 12.7))
            ThreePointArc((25.517309382, 12.7), (25.411268872, 12.676806001), (25.324594531, 12.611459923))
            ThreePointArc((25.324594531, 12.611459923), (20.360613339, 8.868983216), (14.2875, 7.540625))
            Line((14.2875, 7.540625), (-2.869061969, 7.540625))
            ThreePointArc((-2.869061969, 7.540625), (-3.069812253, 7.442237736), (-3.115040716, 7.223296838))
        make_face()
        with BuildLine():
            ThreePointArc((0, 12.7), (-1.684804778, 12.277684315), (-2.971208445, 11.110601077))
            ThreePointArc((-2.971208445, 11.110601077), (-2.983891173, 10.849816661), (-2.759922511, 10.715625))
            Line((-2.759922511, 10.715625), (14.2875, 10.715625))
            ThreePointArc((14.2875, 10.715625), (17.217764137, 11.099634629), (19.950129906, 12.225729035))
            ThreePointArc((19.950129906, 12.225729035), (20.069074763, 12.511449121), (19.823651837, 12.7))
            Line((19.823651837, 12.7), (0, 12.7))
        make_face()
        with BuildLine():
            ThreePointArc((28.270518036, 7.626686424), (28.481769371, 7.678974408), (28.575, 7.875619289))
            Line((28.575, 7.875619289), (28.575, 10.380630711))
            ThreePointArc((28.575, 10.380630711), (28.481769371, 10.577275592), (28.270518036, 10.629563576))
            ThreePointArc((28.270518036, 10.629563576), (27.042999, 9.128125), (28.270518036, 7.626686424))
        make_face()
    extrude(amount=MIRROR1_3_DEPTH)


solid = part_1.part
